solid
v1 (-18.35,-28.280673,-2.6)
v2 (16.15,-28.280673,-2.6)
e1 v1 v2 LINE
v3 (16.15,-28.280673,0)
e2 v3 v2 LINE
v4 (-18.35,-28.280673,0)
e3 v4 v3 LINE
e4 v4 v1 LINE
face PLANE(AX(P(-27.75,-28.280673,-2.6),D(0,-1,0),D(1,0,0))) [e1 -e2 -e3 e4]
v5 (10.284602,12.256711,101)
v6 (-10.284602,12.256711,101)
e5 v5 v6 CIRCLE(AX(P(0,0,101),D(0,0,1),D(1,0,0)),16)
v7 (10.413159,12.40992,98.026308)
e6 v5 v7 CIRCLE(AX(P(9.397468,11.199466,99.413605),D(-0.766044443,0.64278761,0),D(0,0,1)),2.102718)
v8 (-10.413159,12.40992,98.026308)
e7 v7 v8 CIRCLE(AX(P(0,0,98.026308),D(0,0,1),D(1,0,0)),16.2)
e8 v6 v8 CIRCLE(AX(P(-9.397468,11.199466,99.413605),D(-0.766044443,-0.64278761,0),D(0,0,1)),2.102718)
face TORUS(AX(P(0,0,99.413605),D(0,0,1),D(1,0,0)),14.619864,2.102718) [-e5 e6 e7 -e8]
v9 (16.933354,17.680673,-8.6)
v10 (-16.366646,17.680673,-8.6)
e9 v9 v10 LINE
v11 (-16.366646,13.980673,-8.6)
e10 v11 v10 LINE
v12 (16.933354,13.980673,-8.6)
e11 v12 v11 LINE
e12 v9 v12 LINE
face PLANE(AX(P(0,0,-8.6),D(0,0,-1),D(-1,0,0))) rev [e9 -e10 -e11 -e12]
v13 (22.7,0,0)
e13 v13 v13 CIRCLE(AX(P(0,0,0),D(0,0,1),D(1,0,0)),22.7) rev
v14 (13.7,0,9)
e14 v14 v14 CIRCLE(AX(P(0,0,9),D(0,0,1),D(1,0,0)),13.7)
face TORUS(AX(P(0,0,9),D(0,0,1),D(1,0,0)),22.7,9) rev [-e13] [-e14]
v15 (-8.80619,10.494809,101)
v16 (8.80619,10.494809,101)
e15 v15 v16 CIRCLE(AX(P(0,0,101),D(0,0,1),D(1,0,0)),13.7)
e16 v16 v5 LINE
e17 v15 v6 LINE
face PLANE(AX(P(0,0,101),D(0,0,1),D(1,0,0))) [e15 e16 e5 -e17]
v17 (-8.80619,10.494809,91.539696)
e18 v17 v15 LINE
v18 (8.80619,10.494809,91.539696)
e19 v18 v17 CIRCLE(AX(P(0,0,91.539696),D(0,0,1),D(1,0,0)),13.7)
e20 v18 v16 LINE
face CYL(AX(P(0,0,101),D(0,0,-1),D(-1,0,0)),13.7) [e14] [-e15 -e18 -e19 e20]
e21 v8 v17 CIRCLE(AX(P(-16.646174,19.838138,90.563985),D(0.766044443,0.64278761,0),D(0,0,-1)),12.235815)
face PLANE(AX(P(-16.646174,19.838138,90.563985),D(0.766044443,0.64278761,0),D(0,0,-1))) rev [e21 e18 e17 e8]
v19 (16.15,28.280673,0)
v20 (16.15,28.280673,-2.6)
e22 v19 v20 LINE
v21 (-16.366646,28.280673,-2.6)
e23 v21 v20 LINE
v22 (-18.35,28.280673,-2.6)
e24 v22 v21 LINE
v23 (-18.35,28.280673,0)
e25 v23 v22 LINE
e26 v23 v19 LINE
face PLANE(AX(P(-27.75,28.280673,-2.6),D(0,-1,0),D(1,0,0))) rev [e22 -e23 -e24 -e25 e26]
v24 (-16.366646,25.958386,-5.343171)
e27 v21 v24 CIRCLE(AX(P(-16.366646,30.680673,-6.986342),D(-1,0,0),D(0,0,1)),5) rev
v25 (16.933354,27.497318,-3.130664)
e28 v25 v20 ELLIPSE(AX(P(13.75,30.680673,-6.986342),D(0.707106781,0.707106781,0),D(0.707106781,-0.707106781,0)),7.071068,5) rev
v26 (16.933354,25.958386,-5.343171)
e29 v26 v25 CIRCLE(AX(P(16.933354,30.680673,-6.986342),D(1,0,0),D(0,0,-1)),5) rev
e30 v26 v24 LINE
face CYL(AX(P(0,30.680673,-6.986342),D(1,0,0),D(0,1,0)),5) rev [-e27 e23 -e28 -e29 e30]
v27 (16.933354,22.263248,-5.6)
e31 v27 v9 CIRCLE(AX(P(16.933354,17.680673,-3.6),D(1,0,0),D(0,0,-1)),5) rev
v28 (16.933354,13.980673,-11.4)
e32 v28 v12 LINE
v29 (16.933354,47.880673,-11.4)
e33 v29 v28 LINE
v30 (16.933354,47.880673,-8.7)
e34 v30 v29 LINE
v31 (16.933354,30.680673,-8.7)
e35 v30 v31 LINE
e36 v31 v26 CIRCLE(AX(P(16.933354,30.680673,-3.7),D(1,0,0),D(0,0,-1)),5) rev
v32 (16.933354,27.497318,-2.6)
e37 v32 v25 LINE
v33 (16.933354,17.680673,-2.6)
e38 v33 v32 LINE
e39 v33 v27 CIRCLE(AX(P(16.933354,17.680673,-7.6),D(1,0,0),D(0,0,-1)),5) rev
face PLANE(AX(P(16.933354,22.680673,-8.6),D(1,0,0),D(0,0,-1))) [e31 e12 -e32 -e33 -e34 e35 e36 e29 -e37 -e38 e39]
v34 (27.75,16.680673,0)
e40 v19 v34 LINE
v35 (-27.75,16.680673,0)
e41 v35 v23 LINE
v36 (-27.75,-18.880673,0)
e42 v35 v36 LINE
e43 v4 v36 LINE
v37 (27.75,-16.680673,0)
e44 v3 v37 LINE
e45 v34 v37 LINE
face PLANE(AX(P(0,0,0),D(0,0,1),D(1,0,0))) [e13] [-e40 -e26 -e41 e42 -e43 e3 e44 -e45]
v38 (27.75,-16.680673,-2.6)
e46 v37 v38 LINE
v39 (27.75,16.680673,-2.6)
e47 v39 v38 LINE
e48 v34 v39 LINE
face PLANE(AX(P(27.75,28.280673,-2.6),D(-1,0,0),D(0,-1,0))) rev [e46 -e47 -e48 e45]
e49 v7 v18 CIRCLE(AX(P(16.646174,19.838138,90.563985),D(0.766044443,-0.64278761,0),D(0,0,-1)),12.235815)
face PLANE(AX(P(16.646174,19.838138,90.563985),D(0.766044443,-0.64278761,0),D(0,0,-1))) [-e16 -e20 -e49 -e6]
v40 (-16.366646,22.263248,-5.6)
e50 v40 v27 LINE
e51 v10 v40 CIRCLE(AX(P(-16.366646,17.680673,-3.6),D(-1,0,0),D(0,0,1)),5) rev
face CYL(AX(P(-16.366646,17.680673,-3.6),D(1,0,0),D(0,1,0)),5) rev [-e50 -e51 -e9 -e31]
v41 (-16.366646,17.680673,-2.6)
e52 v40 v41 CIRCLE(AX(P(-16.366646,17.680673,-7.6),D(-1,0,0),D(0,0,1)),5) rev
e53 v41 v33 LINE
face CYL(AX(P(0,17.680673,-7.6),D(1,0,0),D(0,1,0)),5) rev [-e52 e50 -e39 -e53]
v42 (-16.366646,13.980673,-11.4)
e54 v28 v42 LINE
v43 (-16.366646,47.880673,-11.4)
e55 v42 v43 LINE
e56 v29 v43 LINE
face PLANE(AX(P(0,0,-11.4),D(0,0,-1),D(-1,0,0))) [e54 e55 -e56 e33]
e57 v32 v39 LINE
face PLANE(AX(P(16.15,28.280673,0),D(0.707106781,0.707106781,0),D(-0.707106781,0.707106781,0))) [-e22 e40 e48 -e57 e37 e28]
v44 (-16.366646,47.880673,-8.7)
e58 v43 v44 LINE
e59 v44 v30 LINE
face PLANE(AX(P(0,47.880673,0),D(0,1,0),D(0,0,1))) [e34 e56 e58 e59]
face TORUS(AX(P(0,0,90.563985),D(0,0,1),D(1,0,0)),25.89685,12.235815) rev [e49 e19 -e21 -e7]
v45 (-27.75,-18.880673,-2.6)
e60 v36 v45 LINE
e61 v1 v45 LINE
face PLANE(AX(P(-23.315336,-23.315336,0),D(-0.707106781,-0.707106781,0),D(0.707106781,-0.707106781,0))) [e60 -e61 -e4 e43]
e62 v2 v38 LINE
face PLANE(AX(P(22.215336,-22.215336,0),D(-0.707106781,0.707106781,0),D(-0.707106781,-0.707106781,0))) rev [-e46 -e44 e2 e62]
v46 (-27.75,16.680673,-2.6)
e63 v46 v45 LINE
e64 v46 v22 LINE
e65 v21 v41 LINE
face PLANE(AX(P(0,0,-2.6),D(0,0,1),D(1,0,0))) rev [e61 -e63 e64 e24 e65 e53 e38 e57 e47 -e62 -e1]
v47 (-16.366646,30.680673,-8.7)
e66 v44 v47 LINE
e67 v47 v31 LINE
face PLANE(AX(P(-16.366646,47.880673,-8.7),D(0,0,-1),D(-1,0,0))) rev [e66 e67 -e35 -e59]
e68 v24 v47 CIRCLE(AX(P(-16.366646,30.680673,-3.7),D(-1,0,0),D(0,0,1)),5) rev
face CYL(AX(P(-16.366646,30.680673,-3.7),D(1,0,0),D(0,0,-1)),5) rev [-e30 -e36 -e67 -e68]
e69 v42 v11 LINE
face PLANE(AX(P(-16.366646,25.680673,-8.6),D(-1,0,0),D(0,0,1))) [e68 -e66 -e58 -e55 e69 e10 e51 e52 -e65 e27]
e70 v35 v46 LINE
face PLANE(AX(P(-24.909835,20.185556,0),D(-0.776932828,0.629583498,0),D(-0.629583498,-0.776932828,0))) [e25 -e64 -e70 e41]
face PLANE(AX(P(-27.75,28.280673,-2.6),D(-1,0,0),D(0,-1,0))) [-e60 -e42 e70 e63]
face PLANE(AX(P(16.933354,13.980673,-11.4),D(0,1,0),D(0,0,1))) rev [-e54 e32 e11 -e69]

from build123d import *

# Parameters (mm, degrees)
SKETCH1_R                = 13.7
BOSS_EXTRUDE1_DEPTH      = 101
SKETCH5_W                = 55.5
SKETCH5_H                = 56.561345004
BOSS_EXTRUDE2_DEPTH      = 2.6
CUT_EXTRUDE4_DEPTH       = 2.6
BOSS_EXTRUDE4_DEPTH      = 6
SKETCH8_W                = 33.3
SKETCH8_H                = 11.7
BOSS_EXTRUDE5_DEPTH      = 2.8
SKETCH9_W                = 33.3
SKETCH9_H                = 2.7
BOSS_EXTRUDE6_DEPTH      = 22.2
FILLET2_R                = 5
REVOLVE1_ANGLE           = 40
REVOLVE1_OTHER_WAY_ANGLE = 40
FILLET6_R                = 9


with BuildPart() as part:
    # Sketch1 → Boss-Extrude1 (new body)
    with BuildSketch(Plane.XY):
        with Locations(Location((0, 0, 0), (0, 0, 180))):
            Circle(SKETCH1_R)
    extrude(amount=BOSS_EXTRUDE1_DEPTH)

    # Sketch5 → Boss-Extrude2 (add)
    with BuildSketch(Plane(origin=(0, 0, 0), x_dir=(-1, 0, 0), z_dir=(0, 0, -1))):
        Rectangle(SKETCH5_W, SKETCH5_H)
    extrude(amount=BOSS_EXTRUDE2_DEPTH)

    # Sketch6 → Cut-Extrude4 (cut)
    with BuildSketch(Plane(origin=(0, 0, -2.6), x_dir=(-1, 0, 0), z_dir=(0, 0, -1))):
        Polygon((27.75, 28.280672502), (18.35, 28.280672502), (27.75, 16.680672502), align=None)
        Polygon((-16.15, -28.280672502), (-27.75, -16.680672502), (-27.75, -28.280672502), align=None)
        Polygon((27.75, -18.880672502), (18.35, -28.280672502), (27.75, -28.280672502), align=None)
        Polygon((-27.75, 16.680672502), (-27.75, 28.280672502), (-16.15, 28.280672502), align=None)
    extrude(amount=-CUT_EXTRUDE4_DEPTH, mode=Mode.SUBTRACT)

    # Sketch7 → Boss-Extrude4 (add)
    with BuildSketch(Plane(origin=(0, 0, -2.6), x_dir=(-1, 0, 0), z_dir=(0, 0, -1))):
        Polygon((1.1, 25.680672502), (16.366645995, 25.680672502), (16.366645995, 22.680672502), (-16.933354005, 22.680672502), (-16.933354005, 25.680672502), align=None)
    extrude(amount=BOSS_EXTRUDE4_DEPTH)

    # Sketch8 → Boss-Extrude5 (add)
    with BuildSketch(Plane(origin=(0, 0, -8.6), x_dir=(-1, 0, 0), z_dir=(0, 0, -1))):
        with Locations((-0.283354005, 19.830672502)):
            Rectangle(SKETCH8_W, SKETCH8_H)
    extrude(amount=BOSS_EXTRUDE5_DEPTH)

    # Sketch9 → Boss-Extrude6 (add)
    with BuildSketch(Plane(origin=(0, 25.680672502, 0), x_dir=(1, 0, 0), z_dir=(0, 1, 0))):
        with Locations((0.283354005, 10.05)):
            Rectangle(SKETCH9_W, SKETCH9_H)
    extrude(amount=BOSS_EXTRUDE6_DEPTH)

    # Fillet2
    # the kernel refuses this fillet: 5 mm, written as the material it adds along each edge
    with BuildSketch(Plane(origin=(-16.366645995, 25.680672502, -2.6), x_dir=(0, 1, 0), z_dir=(1, 0, 0))) as fillet2_piece_1_section:
        with BuildLine():
            CenterArc((5, -4.38634244), FILLET2_R, 118.685402014, 61.314597986)
            Line((0, -4.38634244), (-0.1, -4.38634244))
            Line((-0.1, -4.38634244), (-0.1, 0))
            Line((-0.1, 0), (0, 0.1))
            ThreePointArc((0, 0.1), (1.3, 0.1), (2.552, 0.087726849))
            Line((2.552, 0.087726849), (2.6, 0))
        make_face()
    fillet2_piece_1 = extrude(amount=33.3, mode=Mode.PRIVATE)
    fillet2_piece_1 = split(fillet2_piece_1, bisect_by=Plane(origin=(9.175527955, 35.255144547, -3.690317045), z_dir=(-0.7071067811865442, -0.7071067811865509, 0)), keep=Keep.TOP, mode=Mode.PRIVATE)
    add(fillet2_piece_1)
    with BuildSketch(Plane(origin=(-16.366645995, 22.680672502, -2.6), x_dir=(0, -1, 0), z_dir=(1, 0, 0))) as fillet2_piece_2:
        with BuildLine():
            CenterArc((FILLET2_R, FILLET2_R), FILLET2_R, 180, 90)
            Line((0, FILLET2_R), (-FILLET2_R * 0.02, FILLET2_R))
            Line((-FILLET2_R * 0.02, FILLET2_R), (-FILLET2_R * 0.02, -FILLET2_R * 0.02))
            Line((-FILLET2_R * 0.02, -FILLET2_R * 0.02), (FILLET2_R, -FILLET2_R * 0.02))
            Line((FILLET2_R, -FILLET2_R * 0.02), (FILLET2_R, 0))
        make_face()
    extrude(amount=33.3)
    with BuildSketch(Plane(origin=(-16.366645995, 22.680672502, -8.6), x_dir=(0, -1, 0), z_dir=(1, 0, 0)), Plane(origin=(16.933354005, 25.680672502, -8.7), x_dir=(0, 1, 0), z_dir=(-1, 0, 0))) as fillet2_piece_3:
        with BuildLine():
            CenterArc((FILLET2_R, -FILLET2_R), FILLET2_R, 90, 90)
            Line((0, -FILLET2_R), (-FILLET2_R * 0.02, -FILLET2_R))
            Line((-FILLET2_R * 0.02, -FILLET2_R), (-FILLET2_R * 0.02, FILLET2_R * 0.02))
            Line((-FILLET2_R * 0.02, FILLET2_R * 0.02), (FILLET2_R, FILLET2_R * 0.02))
            Line((FILLET2_R, FILLET2_R * 0.02), (FILLET2_R, 0))
        make_face()
    extrude(amount=33.3)

    # Sketch10 → Revolve1 (revolve)
    with BuildSketch(Plane.ZY):
        with BuildLine():
            Line((101, 13.7), (101, 16))
            ThreePointArc((101, 16), (99.554707727, 16.71784268), (98.02630764, 16.2))
            ThreePointArc((98.02630764, 16.2), (94.964280854, 14.479645567), (91.539696179, 13.7))
            Line((91.539696179, 13.7), (101, 13.7))
        make_face()
    revolve(axis=Axis((0, 0, 101.100764075), (0, 0, -1)), revolution_arc=REVOLVE1_ANGLE)

    # Sketch10 → Revolve1 other way (revolve)
    with BuildSketch(Plane.ZY):
        with BuildLine():
            Line((101, 13.7), (101, 16))
            ThreePointArc((101, 16), (99.554707727, 16.71784268), (98.02630764, 16.2))
            ThreePointArc((98.02630764, 16.2), (94.964280854, 14.479645567), (91.539696179, 13.7))
            Line((91.539696179, 13.7), (101, 13.7))
        make_face()
    revolve(axis=Axis((0, 0, 101.100764075), (0, 0, 1)), revolution_arc=REVOLVE1_OTHER_WAY_ANGLE)

    # Fillet6
    fillet6_edges = [part.edges().sort_by_distance(p)[0] for p in [
        (13.7, 0, 0),
    ]]
    fillet(fillet6_edges, radius=FILLET6_R)


solid = part.part
